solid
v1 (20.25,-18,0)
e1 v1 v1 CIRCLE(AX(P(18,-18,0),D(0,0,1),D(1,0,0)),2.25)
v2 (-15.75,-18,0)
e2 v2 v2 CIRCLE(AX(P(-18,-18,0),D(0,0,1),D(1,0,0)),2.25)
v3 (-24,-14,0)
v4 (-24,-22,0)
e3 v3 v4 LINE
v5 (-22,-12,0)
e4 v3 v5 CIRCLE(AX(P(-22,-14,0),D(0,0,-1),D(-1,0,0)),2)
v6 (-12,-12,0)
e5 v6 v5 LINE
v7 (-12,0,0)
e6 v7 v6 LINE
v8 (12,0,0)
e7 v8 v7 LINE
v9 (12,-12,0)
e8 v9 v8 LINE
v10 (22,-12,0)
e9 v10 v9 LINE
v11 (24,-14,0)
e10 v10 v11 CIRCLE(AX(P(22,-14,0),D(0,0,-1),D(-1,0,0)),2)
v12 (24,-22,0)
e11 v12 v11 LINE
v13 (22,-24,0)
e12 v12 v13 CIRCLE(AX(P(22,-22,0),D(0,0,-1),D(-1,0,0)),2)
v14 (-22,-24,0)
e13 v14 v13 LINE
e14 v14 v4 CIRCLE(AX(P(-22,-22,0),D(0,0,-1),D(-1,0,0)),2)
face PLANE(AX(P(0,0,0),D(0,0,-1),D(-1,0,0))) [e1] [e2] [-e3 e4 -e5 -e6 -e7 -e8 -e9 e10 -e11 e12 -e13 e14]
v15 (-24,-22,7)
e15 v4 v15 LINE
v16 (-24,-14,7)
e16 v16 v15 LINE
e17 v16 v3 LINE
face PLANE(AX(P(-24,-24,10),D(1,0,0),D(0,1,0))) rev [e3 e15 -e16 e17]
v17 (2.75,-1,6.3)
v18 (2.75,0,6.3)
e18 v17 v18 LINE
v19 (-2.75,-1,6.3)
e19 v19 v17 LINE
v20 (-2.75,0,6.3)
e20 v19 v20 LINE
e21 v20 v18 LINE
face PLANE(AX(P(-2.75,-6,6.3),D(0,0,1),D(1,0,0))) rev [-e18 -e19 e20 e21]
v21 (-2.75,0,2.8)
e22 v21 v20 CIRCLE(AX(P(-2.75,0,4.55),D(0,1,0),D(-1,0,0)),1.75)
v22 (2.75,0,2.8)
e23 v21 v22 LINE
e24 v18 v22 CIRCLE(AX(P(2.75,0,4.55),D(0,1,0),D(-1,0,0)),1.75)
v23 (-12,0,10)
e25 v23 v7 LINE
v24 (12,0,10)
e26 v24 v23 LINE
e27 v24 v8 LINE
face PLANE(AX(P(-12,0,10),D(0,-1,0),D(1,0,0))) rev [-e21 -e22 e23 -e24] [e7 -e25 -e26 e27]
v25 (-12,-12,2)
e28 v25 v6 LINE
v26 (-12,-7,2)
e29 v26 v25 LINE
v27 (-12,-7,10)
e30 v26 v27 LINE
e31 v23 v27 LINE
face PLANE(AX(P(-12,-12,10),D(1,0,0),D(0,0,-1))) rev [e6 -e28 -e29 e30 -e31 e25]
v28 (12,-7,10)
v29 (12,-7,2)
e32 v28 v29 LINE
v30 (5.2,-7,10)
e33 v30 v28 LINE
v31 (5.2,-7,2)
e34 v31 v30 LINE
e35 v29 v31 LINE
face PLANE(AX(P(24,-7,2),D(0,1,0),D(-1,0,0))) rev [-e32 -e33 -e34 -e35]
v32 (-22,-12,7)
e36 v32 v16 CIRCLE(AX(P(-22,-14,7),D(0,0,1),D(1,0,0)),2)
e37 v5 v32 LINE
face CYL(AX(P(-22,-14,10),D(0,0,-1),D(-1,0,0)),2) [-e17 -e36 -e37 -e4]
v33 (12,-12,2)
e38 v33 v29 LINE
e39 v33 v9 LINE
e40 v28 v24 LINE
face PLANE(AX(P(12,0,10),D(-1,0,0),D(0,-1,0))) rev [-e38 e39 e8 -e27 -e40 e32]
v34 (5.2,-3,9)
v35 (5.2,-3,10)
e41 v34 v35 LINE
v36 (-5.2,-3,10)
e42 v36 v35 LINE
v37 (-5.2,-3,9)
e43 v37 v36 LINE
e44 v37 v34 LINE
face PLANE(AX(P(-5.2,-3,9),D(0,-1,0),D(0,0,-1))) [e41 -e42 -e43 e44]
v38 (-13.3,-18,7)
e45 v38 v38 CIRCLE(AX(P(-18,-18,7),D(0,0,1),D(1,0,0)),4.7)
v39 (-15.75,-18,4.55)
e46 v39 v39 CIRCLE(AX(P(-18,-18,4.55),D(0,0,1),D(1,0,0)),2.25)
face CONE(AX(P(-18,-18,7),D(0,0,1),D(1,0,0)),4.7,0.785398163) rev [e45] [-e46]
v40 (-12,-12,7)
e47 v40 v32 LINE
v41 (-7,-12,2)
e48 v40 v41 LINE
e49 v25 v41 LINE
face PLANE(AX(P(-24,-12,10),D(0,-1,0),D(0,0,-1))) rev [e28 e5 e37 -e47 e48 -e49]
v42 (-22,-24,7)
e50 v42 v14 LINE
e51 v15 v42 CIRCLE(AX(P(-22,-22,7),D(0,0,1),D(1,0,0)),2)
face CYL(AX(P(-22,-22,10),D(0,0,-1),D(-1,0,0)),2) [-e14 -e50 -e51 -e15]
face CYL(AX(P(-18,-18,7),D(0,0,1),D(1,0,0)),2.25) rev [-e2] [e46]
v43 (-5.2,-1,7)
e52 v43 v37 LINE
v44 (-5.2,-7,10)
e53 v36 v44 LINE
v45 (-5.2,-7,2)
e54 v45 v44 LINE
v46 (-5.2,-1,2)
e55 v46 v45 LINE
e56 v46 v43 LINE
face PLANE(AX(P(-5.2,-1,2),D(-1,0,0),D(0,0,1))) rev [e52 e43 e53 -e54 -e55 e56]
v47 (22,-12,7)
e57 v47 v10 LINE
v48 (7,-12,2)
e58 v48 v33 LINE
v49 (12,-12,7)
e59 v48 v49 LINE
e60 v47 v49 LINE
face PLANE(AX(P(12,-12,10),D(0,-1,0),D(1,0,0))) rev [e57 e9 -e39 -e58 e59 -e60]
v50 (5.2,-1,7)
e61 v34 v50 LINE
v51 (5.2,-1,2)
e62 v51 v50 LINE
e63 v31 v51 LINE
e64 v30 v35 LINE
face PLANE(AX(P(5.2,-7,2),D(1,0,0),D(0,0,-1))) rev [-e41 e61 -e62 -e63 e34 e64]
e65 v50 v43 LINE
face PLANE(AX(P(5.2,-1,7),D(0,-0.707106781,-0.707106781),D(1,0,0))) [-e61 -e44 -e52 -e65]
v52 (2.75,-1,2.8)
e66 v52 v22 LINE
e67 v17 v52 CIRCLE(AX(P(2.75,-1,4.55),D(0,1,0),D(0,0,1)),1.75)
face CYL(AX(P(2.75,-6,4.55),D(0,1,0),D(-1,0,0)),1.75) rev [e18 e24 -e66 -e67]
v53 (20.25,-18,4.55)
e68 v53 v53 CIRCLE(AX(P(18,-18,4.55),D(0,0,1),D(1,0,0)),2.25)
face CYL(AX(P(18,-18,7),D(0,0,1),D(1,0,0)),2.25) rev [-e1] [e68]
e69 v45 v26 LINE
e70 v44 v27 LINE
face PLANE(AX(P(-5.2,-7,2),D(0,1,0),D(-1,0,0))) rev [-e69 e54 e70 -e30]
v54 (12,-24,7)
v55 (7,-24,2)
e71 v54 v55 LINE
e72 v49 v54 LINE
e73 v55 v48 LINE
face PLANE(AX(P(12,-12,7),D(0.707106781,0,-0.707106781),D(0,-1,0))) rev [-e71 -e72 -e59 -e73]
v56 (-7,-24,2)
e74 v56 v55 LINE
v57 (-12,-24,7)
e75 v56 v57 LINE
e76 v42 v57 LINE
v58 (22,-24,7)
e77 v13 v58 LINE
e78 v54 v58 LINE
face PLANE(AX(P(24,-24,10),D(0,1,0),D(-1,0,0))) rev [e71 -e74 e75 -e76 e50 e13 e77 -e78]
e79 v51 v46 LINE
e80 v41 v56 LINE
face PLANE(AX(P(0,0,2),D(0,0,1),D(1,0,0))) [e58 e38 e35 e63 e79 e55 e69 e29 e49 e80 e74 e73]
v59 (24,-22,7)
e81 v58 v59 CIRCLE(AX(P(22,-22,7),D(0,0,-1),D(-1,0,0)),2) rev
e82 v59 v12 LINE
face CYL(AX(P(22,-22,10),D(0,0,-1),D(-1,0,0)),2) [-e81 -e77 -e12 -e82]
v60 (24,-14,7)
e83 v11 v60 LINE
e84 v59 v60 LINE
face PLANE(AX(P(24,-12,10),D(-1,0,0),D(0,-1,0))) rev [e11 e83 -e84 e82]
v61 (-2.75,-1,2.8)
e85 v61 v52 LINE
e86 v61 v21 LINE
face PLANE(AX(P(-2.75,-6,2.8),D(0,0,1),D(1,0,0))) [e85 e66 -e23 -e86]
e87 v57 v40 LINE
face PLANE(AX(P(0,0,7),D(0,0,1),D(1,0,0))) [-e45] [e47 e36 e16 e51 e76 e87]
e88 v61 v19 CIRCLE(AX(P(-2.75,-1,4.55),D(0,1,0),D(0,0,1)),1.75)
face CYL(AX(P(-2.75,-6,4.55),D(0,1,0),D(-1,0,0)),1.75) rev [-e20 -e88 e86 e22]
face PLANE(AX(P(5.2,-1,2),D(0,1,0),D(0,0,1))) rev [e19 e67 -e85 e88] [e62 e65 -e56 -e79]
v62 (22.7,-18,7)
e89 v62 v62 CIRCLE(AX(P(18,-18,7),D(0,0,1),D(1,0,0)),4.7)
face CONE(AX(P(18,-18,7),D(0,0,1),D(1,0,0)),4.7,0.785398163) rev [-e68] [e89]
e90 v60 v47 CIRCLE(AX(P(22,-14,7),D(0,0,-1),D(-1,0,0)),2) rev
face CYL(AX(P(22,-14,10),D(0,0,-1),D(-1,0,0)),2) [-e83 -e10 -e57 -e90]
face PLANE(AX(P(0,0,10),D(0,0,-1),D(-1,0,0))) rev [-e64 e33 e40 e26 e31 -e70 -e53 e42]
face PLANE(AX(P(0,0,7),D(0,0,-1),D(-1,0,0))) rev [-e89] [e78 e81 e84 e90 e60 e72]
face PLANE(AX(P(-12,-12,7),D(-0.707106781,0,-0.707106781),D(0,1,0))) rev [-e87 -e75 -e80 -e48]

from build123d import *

# Parameters (mm, degrees)
AUFSATZ_LINEAR_AUSTRAGEN1_DEPTH                      = 10
SCHNITT_LINEAR_AUSTRAGEN1_DEPTH                      = 8
SCHNITT_LINEAR_AUSTRAGEN2_DEPTH                      = 6
SKIZZE4_W                                            = 12
SKIZZE4_H                                            = 12
AUFSATZ_LINEAR_AUSTRAGEN2_DEPTH                      = 5
FASE1_SIZE                                           = 5
FORMSENKUNG_F_R_M4_LINSENSENKSCHRAUBE_MI_D           = 4.5
FORMSENKUNG_F_R_M4_LINSENSENKSCHRAUBE_MI_CSINK_D     = 9.4
FORMSENKUNG_F_R_M4_LINSENSENKSCHRAUBE_MI_CSINK_ANGLE = 90
VERRUNDUNG1_R                                        = 2
SKIZZE8_W                                            = 10.4
SKIZZE8_H                                            = 2
AUFSATZ_LINEAR_AUSTRAGEN3_DEPTH                      = 1
FASE2_SIZE                                           = 2


with BuildPart() as part:
    # Skizze1 → Aufsatz-Linear austragen1 (new body)
    with BuildSketch(Plane.XY):
        Polygon((-12, 0), (12, 0), (12, -12), (24, -12), (24, -24), (-24, -24), (-24, -12), (-12, -12), align=None)
    extrude(amount=AUFSATZ_LINEAR_AUSTRAGEN1_DEPTH)

    # Skizze2 → Schnitt-Linear austragen1 (cut)
    with BuildSketch(Plane.XY.offset(10)):
        Polygon((-5.2, -1), (-5.2, -7), (-24, -7), (-24, -24), (24, -24), (24, -7), (5.2, -7), (5.2, -1), align=None)
    extrude(amount=-SCHNITT_LINEAR_AUSTRAGEN1_DEPTH, mode=Mode.SUBTRACT)

    # Skizze3 → Schnitt-Linear austragen2 (cut)
    with BuildSketch(Plane(origin=(0, 0, 0), x_dir=(1, 0, 0), z_dir=(0, 1, 0))):
        with BuildLine():
            Line((-2.75, -2.8), (2.75, -2.8))
            ThreePointArc((2.75, -2.8), (4.5, -4.55), (2.75, -6.3))
            Line((2.75, -6.3), (-2.75, -6.3))
            ThreePointArc((-2.75, -6.3), (-4.5, -4.55), (-2.75, -2.8))
        make_face()
    extrude(amount=-SCHNITT_LINEAR_AUSTRAGEN2_DEPTH, mode=Mode.SUBTRACT)

    # Skizze4 → Aufsatz-Linear austragen2 (add)
    with BuildSketch(Plane.XY.offset(2)):
        with Locations((-18, -18)):
            Rectangle(SKIZZE4_W, SKIZZE4_H)
        with Locations((18, -18)):
            Rectangle(SKIZZE4_W, SKIZZE4_H)
    extrude(amount=AUFSATZ_LINEAR_AUSTRAGEN2_DEPTH)

    # Fase1
    fase1_edges = [part.edges().sort_by_distance(p)[0] for p in [
        (12, -18, 2),
        (-12, -18, 2),
    ]]
    chamfer(fase1_edges, length=FASE1_SIZE - 0.0001)  # a hair under: the kernel refuses the full size

    # Formsenkung für M4 Linsensenkschraube mit Schlitz1 (through all)
    with Locations(Plane.XY.offset(7)):
        with Locations((-18, -18), (18, -18)):
            CounterSinkHole(FORMSENKUNG_F_R_M4_LINSENSENKSCHRAUBE_MI_D / 2, FORMSENKUNG_F_R_M4_LINSENSENKSCHRAUBE_MI_CSINK_D / 2, counter_sink_angle=FORMSENKUNG_F_R_M4_LINSENSENKSCHRAUBE_MI_CSINK_ANGLE)

    # Verrundung1
    verrundung1_edges = [part.edges().sort_by_distance(p)[0] for p in [
        (24, -12, 3.5),
        (24, -24, 3.5),
        (-24, -24, 3.5),
        (-24, -12, 3.5),
    ]]
    fillet(verrundung1_edges, radius=VERRUNDUNG1_R)

    # Skizze8 → Aufsatz-Linear austragen3 (add)
    with BuildSketch(Plane.XY.offset(10)):
        with Locations((0, -2)):
            Rectangle(SKIZZE8_W, SKIZZE8_H)
    extrude(amount=-AUFSATZ_LINEAR_AUSTRAGEN3_DEPTH)

    # Fase2
    fase2_edges = [part.edges().sort_by_distance(p)[0] for p in [
        (0, -1, 9),
    ]]
    chamfer(fase2_edges, length=FASE2_SIZE - 0.0001)  # a hair under: the kernel refuses the full size


solid = part.part
